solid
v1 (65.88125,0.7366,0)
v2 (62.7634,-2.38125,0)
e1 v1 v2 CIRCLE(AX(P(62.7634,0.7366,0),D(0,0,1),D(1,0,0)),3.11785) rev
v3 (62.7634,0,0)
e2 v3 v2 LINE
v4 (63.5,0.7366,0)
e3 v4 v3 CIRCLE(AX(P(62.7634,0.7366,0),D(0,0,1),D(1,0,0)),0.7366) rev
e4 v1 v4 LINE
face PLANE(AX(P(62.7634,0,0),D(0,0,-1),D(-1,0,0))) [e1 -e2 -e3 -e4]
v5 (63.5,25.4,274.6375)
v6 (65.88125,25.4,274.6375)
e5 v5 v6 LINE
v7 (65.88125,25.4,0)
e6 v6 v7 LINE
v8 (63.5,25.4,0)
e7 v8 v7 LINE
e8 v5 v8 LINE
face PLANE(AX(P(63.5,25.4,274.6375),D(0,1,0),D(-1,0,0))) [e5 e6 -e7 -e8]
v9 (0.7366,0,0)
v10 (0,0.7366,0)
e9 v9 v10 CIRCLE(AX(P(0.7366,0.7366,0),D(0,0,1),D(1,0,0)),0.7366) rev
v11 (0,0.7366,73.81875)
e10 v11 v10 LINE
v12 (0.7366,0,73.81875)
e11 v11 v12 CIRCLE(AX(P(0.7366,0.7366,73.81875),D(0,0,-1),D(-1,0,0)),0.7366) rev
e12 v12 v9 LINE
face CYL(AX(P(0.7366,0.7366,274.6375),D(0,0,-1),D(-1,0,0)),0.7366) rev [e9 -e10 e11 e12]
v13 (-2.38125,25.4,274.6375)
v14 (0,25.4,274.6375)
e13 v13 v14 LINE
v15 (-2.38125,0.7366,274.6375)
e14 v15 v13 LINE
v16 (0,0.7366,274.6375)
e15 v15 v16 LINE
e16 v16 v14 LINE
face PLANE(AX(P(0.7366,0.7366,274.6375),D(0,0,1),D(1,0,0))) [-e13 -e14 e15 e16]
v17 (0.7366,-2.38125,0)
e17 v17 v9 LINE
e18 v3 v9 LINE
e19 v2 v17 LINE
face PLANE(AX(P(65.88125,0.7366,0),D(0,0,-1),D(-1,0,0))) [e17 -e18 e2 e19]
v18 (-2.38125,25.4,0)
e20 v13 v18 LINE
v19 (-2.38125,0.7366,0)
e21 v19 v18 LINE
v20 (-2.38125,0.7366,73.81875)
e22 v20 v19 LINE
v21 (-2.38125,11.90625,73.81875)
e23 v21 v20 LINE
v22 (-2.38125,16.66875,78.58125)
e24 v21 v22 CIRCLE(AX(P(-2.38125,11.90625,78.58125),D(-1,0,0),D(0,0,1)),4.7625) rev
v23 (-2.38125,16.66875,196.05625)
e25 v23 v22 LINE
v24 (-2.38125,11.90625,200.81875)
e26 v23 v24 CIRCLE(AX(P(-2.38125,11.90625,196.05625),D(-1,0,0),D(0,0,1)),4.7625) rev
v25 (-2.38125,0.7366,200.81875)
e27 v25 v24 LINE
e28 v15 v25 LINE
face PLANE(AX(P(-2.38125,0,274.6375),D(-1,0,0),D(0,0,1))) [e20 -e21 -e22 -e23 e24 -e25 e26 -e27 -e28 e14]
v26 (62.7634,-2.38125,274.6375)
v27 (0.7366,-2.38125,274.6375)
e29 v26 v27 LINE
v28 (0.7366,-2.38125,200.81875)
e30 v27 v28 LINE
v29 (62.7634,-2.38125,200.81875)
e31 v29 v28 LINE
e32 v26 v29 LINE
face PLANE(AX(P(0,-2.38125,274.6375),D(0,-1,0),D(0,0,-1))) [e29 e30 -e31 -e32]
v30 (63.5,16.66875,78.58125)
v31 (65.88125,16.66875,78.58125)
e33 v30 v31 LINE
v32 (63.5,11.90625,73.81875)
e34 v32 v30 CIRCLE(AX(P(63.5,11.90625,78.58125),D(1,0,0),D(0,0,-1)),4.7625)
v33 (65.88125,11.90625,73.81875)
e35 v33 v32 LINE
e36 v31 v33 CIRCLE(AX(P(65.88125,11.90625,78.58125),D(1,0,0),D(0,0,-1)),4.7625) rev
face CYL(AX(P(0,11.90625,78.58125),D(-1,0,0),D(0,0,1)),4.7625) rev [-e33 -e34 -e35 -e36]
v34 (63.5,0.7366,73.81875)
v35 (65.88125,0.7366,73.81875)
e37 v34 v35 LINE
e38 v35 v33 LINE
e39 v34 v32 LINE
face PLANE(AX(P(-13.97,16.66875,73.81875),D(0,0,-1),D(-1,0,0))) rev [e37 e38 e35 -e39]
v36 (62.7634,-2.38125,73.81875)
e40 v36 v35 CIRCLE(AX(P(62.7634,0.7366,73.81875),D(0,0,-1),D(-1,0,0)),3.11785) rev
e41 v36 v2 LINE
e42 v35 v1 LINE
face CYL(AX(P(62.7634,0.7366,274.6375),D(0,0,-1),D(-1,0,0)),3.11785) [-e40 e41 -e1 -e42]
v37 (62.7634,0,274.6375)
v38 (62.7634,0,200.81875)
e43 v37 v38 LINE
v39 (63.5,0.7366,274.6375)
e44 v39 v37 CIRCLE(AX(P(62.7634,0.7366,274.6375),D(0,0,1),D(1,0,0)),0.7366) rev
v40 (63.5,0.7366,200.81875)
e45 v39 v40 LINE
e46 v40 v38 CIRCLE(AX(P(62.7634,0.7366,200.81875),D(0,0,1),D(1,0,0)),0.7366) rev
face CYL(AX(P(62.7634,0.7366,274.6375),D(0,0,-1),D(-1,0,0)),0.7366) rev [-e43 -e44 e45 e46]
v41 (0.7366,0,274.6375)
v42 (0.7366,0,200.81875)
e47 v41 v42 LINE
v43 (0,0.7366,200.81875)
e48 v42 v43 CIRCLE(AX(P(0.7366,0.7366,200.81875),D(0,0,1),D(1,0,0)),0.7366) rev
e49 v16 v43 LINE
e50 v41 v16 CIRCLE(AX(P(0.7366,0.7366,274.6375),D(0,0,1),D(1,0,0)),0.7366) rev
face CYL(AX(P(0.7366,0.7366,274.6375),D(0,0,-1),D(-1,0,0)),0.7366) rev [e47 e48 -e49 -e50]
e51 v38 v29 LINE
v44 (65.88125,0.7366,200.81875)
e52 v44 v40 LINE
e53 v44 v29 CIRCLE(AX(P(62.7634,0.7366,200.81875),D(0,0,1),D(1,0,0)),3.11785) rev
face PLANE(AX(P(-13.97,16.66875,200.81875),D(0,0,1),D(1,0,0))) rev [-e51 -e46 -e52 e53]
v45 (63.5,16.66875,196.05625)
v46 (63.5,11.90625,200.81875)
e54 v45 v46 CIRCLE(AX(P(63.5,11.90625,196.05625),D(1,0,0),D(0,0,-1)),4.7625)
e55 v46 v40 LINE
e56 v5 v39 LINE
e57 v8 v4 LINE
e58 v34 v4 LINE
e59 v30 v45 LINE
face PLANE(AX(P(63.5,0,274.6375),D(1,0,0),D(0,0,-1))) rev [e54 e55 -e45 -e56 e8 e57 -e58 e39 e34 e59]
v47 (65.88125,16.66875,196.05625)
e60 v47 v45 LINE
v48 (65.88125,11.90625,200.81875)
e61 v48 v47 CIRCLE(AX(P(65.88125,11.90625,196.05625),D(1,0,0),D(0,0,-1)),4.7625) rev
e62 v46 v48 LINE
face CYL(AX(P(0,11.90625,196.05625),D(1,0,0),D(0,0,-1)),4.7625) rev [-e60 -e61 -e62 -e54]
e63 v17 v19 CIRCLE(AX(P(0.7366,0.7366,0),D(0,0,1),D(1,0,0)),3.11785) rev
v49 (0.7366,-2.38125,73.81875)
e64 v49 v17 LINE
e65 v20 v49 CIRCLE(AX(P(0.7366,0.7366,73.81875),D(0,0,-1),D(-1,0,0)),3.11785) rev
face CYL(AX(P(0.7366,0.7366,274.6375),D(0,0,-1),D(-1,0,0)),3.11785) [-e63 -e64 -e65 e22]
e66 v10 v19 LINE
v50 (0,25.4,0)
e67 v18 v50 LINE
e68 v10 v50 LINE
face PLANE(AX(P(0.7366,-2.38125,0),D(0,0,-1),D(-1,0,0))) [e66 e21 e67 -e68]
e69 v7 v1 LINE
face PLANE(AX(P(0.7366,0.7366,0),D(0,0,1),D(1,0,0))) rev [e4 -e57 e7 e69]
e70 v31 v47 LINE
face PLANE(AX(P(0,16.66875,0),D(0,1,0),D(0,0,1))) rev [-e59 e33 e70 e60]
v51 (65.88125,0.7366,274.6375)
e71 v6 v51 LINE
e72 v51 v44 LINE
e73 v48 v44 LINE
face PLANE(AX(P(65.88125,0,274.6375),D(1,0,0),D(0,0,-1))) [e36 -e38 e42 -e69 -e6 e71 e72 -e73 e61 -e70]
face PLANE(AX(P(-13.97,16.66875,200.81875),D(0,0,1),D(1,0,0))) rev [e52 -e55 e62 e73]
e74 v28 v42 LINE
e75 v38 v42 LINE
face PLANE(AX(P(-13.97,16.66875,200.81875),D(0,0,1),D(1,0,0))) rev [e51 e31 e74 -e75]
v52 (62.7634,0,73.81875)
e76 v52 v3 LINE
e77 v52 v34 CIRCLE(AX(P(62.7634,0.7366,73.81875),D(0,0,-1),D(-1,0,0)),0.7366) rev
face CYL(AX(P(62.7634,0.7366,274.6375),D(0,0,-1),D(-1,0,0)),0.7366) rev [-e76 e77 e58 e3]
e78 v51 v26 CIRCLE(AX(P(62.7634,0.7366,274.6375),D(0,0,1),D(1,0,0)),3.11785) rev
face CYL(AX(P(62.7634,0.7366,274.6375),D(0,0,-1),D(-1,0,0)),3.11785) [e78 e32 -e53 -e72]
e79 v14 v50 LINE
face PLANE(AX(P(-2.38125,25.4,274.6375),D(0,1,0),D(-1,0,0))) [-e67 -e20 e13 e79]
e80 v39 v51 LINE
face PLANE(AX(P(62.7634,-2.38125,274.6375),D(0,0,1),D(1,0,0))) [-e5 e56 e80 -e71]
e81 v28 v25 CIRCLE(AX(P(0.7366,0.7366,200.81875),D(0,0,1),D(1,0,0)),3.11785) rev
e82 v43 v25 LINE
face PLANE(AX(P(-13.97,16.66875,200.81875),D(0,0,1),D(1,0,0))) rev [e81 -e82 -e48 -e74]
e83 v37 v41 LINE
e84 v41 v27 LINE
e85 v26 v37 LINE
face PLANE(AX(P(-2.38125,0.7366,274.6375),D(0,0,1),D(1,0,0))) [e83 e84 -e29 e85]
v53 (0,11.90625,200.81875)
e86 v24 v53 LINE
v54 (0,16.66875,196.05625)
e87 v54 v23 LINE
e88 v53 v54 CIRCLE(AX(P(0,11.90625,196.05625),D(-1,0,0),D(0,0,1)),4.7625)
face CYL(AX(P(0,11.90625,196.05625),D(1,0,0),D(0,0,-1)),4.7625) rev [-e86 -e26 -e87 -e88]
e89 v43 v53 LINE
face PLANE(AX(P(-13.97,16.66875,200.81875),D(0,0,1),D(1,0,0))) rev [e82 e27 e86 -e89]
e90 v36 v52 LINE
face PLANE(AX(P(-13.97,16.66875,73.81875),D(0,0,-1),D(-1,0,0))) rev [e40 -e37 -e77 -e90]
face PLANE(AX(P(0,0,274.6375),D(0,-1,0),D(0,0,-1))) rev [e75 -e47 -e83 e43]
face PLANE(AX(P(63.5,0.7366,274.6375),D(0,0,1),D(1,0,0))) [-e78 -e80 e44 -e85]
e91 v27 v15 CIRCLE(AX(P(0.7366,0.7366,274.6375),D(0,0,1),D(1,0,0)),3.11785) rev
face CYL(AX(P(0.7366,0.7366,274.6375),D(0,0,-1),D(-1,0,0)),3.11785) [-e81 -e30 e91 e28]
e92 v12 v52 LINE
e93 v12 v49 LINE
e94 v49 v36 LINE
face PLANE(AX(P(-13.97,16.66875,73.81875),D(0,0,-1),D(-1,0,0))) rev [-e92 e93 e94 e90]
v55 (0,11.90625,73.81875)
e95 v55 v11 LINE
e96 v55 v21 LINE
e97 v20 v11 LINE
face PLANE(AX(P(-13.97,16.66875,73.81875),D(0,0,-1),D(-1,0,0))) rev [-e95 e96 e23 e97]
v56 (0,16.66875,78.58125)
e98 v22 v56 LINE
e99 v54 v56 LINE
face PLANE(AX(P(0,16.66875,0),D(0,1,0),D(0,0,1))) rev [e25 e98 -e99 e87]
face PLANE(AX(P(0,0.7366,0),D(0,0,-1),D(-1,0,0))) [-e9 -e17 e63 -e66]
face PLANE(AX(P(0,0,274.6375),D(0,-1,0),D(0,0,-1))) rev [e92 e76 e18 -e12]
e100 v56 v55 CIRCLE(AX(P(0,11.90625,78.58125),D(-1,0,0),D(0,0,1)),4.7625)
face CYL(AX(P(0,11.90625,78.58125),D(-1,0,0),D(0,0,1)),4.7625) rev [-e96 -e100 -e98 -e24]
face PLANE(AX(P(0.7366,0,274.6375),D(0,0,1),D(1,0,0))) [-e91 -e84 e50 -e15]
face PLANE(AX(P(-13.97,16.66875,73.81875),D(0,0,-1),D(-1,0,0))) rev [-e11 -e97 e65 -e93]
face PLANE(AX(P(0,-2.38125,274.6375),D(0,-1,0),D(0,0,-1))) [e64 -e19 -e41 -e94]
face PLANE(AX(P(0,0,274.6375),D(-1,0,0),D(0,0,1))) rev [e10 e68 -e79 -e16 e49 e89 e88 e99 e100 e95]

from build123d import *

# Parameters (mm, degrees)
BASE_FLANGE1_DEPTH = 274.6375
SKETCH2_W          = 91.44
SKETCH2_H          = 127
CUT_EXTRUDE1_DEPTH = 19.05
FILLET1_R          = 4.7625


# Sheet-metal steps are written as plain solids
with BuildPart() as part:
    # Sketch1 → Base-Flange1 (new body)
    with BuildSketch(Plane.XY):
        with BuildLine():
            Line((0, 25.4), (0, 0.7366))
            ThreePointArc((0, 0.7366), (0.215745145, 0.215745145), (0.7366, 0))
            Line((0.7366, 0), (62.7634, 0))
            ThreePointArc((62.7634, 0), (63.284254855, 0.215745145), (63.5, 0.7366))
            Line((63.5, 0.7366), (63.5, 25.4))
            Line((63.5, 25.4), (65.88125, 25.4))
            Line((65.88125, 25.4), (65.88125, 0.7366))
            ThreePointArc((65.88125, 0.7366), (64.968052878, -1.468052878), (62.7634, -2.38125))
            Line((62.7634, -2.38125), (0.7366, -2.38125))
            ThreePointArc((0.7366, -2.38125), (-1.468052878, -1.468052878), (-2.38125, 0.7366))
            Line((-2.38125, 0.7366), (-2.38125, 25.4))
            Line((-2.38125, 25.4), (0, 25.4))
        make_face()
    extrude(amount=BASE_FLANGE1_DEPTH)

    # Sketch2 → Cut-Extrude1 (cut)
    with BuildSketch(Plane.XZ.offset(2.38125)):
        with Locations((31.75, 137.31875)):
            Rectangle(SKETCH2_W, SKETCH2_H)
    extrude(amount=-CUT_EXTRUDE1_DEPTH, mode=Mode.SUBTRACT)

    # Fillet1
    fillet1_edges = [part.edges().sort_by_distance(p)[0] for p in [
        (-1.190625, 16.66875, 73.81875),
        (64.690625, 16.66875, 73.81875),
        (64.690625, 16.66875, 200.81875),
        (-1.190625, 16.66875, 200.81875),
    ]]
    fillet(fillet1_edges, radius=FILLET1_R)


solid = part.part
